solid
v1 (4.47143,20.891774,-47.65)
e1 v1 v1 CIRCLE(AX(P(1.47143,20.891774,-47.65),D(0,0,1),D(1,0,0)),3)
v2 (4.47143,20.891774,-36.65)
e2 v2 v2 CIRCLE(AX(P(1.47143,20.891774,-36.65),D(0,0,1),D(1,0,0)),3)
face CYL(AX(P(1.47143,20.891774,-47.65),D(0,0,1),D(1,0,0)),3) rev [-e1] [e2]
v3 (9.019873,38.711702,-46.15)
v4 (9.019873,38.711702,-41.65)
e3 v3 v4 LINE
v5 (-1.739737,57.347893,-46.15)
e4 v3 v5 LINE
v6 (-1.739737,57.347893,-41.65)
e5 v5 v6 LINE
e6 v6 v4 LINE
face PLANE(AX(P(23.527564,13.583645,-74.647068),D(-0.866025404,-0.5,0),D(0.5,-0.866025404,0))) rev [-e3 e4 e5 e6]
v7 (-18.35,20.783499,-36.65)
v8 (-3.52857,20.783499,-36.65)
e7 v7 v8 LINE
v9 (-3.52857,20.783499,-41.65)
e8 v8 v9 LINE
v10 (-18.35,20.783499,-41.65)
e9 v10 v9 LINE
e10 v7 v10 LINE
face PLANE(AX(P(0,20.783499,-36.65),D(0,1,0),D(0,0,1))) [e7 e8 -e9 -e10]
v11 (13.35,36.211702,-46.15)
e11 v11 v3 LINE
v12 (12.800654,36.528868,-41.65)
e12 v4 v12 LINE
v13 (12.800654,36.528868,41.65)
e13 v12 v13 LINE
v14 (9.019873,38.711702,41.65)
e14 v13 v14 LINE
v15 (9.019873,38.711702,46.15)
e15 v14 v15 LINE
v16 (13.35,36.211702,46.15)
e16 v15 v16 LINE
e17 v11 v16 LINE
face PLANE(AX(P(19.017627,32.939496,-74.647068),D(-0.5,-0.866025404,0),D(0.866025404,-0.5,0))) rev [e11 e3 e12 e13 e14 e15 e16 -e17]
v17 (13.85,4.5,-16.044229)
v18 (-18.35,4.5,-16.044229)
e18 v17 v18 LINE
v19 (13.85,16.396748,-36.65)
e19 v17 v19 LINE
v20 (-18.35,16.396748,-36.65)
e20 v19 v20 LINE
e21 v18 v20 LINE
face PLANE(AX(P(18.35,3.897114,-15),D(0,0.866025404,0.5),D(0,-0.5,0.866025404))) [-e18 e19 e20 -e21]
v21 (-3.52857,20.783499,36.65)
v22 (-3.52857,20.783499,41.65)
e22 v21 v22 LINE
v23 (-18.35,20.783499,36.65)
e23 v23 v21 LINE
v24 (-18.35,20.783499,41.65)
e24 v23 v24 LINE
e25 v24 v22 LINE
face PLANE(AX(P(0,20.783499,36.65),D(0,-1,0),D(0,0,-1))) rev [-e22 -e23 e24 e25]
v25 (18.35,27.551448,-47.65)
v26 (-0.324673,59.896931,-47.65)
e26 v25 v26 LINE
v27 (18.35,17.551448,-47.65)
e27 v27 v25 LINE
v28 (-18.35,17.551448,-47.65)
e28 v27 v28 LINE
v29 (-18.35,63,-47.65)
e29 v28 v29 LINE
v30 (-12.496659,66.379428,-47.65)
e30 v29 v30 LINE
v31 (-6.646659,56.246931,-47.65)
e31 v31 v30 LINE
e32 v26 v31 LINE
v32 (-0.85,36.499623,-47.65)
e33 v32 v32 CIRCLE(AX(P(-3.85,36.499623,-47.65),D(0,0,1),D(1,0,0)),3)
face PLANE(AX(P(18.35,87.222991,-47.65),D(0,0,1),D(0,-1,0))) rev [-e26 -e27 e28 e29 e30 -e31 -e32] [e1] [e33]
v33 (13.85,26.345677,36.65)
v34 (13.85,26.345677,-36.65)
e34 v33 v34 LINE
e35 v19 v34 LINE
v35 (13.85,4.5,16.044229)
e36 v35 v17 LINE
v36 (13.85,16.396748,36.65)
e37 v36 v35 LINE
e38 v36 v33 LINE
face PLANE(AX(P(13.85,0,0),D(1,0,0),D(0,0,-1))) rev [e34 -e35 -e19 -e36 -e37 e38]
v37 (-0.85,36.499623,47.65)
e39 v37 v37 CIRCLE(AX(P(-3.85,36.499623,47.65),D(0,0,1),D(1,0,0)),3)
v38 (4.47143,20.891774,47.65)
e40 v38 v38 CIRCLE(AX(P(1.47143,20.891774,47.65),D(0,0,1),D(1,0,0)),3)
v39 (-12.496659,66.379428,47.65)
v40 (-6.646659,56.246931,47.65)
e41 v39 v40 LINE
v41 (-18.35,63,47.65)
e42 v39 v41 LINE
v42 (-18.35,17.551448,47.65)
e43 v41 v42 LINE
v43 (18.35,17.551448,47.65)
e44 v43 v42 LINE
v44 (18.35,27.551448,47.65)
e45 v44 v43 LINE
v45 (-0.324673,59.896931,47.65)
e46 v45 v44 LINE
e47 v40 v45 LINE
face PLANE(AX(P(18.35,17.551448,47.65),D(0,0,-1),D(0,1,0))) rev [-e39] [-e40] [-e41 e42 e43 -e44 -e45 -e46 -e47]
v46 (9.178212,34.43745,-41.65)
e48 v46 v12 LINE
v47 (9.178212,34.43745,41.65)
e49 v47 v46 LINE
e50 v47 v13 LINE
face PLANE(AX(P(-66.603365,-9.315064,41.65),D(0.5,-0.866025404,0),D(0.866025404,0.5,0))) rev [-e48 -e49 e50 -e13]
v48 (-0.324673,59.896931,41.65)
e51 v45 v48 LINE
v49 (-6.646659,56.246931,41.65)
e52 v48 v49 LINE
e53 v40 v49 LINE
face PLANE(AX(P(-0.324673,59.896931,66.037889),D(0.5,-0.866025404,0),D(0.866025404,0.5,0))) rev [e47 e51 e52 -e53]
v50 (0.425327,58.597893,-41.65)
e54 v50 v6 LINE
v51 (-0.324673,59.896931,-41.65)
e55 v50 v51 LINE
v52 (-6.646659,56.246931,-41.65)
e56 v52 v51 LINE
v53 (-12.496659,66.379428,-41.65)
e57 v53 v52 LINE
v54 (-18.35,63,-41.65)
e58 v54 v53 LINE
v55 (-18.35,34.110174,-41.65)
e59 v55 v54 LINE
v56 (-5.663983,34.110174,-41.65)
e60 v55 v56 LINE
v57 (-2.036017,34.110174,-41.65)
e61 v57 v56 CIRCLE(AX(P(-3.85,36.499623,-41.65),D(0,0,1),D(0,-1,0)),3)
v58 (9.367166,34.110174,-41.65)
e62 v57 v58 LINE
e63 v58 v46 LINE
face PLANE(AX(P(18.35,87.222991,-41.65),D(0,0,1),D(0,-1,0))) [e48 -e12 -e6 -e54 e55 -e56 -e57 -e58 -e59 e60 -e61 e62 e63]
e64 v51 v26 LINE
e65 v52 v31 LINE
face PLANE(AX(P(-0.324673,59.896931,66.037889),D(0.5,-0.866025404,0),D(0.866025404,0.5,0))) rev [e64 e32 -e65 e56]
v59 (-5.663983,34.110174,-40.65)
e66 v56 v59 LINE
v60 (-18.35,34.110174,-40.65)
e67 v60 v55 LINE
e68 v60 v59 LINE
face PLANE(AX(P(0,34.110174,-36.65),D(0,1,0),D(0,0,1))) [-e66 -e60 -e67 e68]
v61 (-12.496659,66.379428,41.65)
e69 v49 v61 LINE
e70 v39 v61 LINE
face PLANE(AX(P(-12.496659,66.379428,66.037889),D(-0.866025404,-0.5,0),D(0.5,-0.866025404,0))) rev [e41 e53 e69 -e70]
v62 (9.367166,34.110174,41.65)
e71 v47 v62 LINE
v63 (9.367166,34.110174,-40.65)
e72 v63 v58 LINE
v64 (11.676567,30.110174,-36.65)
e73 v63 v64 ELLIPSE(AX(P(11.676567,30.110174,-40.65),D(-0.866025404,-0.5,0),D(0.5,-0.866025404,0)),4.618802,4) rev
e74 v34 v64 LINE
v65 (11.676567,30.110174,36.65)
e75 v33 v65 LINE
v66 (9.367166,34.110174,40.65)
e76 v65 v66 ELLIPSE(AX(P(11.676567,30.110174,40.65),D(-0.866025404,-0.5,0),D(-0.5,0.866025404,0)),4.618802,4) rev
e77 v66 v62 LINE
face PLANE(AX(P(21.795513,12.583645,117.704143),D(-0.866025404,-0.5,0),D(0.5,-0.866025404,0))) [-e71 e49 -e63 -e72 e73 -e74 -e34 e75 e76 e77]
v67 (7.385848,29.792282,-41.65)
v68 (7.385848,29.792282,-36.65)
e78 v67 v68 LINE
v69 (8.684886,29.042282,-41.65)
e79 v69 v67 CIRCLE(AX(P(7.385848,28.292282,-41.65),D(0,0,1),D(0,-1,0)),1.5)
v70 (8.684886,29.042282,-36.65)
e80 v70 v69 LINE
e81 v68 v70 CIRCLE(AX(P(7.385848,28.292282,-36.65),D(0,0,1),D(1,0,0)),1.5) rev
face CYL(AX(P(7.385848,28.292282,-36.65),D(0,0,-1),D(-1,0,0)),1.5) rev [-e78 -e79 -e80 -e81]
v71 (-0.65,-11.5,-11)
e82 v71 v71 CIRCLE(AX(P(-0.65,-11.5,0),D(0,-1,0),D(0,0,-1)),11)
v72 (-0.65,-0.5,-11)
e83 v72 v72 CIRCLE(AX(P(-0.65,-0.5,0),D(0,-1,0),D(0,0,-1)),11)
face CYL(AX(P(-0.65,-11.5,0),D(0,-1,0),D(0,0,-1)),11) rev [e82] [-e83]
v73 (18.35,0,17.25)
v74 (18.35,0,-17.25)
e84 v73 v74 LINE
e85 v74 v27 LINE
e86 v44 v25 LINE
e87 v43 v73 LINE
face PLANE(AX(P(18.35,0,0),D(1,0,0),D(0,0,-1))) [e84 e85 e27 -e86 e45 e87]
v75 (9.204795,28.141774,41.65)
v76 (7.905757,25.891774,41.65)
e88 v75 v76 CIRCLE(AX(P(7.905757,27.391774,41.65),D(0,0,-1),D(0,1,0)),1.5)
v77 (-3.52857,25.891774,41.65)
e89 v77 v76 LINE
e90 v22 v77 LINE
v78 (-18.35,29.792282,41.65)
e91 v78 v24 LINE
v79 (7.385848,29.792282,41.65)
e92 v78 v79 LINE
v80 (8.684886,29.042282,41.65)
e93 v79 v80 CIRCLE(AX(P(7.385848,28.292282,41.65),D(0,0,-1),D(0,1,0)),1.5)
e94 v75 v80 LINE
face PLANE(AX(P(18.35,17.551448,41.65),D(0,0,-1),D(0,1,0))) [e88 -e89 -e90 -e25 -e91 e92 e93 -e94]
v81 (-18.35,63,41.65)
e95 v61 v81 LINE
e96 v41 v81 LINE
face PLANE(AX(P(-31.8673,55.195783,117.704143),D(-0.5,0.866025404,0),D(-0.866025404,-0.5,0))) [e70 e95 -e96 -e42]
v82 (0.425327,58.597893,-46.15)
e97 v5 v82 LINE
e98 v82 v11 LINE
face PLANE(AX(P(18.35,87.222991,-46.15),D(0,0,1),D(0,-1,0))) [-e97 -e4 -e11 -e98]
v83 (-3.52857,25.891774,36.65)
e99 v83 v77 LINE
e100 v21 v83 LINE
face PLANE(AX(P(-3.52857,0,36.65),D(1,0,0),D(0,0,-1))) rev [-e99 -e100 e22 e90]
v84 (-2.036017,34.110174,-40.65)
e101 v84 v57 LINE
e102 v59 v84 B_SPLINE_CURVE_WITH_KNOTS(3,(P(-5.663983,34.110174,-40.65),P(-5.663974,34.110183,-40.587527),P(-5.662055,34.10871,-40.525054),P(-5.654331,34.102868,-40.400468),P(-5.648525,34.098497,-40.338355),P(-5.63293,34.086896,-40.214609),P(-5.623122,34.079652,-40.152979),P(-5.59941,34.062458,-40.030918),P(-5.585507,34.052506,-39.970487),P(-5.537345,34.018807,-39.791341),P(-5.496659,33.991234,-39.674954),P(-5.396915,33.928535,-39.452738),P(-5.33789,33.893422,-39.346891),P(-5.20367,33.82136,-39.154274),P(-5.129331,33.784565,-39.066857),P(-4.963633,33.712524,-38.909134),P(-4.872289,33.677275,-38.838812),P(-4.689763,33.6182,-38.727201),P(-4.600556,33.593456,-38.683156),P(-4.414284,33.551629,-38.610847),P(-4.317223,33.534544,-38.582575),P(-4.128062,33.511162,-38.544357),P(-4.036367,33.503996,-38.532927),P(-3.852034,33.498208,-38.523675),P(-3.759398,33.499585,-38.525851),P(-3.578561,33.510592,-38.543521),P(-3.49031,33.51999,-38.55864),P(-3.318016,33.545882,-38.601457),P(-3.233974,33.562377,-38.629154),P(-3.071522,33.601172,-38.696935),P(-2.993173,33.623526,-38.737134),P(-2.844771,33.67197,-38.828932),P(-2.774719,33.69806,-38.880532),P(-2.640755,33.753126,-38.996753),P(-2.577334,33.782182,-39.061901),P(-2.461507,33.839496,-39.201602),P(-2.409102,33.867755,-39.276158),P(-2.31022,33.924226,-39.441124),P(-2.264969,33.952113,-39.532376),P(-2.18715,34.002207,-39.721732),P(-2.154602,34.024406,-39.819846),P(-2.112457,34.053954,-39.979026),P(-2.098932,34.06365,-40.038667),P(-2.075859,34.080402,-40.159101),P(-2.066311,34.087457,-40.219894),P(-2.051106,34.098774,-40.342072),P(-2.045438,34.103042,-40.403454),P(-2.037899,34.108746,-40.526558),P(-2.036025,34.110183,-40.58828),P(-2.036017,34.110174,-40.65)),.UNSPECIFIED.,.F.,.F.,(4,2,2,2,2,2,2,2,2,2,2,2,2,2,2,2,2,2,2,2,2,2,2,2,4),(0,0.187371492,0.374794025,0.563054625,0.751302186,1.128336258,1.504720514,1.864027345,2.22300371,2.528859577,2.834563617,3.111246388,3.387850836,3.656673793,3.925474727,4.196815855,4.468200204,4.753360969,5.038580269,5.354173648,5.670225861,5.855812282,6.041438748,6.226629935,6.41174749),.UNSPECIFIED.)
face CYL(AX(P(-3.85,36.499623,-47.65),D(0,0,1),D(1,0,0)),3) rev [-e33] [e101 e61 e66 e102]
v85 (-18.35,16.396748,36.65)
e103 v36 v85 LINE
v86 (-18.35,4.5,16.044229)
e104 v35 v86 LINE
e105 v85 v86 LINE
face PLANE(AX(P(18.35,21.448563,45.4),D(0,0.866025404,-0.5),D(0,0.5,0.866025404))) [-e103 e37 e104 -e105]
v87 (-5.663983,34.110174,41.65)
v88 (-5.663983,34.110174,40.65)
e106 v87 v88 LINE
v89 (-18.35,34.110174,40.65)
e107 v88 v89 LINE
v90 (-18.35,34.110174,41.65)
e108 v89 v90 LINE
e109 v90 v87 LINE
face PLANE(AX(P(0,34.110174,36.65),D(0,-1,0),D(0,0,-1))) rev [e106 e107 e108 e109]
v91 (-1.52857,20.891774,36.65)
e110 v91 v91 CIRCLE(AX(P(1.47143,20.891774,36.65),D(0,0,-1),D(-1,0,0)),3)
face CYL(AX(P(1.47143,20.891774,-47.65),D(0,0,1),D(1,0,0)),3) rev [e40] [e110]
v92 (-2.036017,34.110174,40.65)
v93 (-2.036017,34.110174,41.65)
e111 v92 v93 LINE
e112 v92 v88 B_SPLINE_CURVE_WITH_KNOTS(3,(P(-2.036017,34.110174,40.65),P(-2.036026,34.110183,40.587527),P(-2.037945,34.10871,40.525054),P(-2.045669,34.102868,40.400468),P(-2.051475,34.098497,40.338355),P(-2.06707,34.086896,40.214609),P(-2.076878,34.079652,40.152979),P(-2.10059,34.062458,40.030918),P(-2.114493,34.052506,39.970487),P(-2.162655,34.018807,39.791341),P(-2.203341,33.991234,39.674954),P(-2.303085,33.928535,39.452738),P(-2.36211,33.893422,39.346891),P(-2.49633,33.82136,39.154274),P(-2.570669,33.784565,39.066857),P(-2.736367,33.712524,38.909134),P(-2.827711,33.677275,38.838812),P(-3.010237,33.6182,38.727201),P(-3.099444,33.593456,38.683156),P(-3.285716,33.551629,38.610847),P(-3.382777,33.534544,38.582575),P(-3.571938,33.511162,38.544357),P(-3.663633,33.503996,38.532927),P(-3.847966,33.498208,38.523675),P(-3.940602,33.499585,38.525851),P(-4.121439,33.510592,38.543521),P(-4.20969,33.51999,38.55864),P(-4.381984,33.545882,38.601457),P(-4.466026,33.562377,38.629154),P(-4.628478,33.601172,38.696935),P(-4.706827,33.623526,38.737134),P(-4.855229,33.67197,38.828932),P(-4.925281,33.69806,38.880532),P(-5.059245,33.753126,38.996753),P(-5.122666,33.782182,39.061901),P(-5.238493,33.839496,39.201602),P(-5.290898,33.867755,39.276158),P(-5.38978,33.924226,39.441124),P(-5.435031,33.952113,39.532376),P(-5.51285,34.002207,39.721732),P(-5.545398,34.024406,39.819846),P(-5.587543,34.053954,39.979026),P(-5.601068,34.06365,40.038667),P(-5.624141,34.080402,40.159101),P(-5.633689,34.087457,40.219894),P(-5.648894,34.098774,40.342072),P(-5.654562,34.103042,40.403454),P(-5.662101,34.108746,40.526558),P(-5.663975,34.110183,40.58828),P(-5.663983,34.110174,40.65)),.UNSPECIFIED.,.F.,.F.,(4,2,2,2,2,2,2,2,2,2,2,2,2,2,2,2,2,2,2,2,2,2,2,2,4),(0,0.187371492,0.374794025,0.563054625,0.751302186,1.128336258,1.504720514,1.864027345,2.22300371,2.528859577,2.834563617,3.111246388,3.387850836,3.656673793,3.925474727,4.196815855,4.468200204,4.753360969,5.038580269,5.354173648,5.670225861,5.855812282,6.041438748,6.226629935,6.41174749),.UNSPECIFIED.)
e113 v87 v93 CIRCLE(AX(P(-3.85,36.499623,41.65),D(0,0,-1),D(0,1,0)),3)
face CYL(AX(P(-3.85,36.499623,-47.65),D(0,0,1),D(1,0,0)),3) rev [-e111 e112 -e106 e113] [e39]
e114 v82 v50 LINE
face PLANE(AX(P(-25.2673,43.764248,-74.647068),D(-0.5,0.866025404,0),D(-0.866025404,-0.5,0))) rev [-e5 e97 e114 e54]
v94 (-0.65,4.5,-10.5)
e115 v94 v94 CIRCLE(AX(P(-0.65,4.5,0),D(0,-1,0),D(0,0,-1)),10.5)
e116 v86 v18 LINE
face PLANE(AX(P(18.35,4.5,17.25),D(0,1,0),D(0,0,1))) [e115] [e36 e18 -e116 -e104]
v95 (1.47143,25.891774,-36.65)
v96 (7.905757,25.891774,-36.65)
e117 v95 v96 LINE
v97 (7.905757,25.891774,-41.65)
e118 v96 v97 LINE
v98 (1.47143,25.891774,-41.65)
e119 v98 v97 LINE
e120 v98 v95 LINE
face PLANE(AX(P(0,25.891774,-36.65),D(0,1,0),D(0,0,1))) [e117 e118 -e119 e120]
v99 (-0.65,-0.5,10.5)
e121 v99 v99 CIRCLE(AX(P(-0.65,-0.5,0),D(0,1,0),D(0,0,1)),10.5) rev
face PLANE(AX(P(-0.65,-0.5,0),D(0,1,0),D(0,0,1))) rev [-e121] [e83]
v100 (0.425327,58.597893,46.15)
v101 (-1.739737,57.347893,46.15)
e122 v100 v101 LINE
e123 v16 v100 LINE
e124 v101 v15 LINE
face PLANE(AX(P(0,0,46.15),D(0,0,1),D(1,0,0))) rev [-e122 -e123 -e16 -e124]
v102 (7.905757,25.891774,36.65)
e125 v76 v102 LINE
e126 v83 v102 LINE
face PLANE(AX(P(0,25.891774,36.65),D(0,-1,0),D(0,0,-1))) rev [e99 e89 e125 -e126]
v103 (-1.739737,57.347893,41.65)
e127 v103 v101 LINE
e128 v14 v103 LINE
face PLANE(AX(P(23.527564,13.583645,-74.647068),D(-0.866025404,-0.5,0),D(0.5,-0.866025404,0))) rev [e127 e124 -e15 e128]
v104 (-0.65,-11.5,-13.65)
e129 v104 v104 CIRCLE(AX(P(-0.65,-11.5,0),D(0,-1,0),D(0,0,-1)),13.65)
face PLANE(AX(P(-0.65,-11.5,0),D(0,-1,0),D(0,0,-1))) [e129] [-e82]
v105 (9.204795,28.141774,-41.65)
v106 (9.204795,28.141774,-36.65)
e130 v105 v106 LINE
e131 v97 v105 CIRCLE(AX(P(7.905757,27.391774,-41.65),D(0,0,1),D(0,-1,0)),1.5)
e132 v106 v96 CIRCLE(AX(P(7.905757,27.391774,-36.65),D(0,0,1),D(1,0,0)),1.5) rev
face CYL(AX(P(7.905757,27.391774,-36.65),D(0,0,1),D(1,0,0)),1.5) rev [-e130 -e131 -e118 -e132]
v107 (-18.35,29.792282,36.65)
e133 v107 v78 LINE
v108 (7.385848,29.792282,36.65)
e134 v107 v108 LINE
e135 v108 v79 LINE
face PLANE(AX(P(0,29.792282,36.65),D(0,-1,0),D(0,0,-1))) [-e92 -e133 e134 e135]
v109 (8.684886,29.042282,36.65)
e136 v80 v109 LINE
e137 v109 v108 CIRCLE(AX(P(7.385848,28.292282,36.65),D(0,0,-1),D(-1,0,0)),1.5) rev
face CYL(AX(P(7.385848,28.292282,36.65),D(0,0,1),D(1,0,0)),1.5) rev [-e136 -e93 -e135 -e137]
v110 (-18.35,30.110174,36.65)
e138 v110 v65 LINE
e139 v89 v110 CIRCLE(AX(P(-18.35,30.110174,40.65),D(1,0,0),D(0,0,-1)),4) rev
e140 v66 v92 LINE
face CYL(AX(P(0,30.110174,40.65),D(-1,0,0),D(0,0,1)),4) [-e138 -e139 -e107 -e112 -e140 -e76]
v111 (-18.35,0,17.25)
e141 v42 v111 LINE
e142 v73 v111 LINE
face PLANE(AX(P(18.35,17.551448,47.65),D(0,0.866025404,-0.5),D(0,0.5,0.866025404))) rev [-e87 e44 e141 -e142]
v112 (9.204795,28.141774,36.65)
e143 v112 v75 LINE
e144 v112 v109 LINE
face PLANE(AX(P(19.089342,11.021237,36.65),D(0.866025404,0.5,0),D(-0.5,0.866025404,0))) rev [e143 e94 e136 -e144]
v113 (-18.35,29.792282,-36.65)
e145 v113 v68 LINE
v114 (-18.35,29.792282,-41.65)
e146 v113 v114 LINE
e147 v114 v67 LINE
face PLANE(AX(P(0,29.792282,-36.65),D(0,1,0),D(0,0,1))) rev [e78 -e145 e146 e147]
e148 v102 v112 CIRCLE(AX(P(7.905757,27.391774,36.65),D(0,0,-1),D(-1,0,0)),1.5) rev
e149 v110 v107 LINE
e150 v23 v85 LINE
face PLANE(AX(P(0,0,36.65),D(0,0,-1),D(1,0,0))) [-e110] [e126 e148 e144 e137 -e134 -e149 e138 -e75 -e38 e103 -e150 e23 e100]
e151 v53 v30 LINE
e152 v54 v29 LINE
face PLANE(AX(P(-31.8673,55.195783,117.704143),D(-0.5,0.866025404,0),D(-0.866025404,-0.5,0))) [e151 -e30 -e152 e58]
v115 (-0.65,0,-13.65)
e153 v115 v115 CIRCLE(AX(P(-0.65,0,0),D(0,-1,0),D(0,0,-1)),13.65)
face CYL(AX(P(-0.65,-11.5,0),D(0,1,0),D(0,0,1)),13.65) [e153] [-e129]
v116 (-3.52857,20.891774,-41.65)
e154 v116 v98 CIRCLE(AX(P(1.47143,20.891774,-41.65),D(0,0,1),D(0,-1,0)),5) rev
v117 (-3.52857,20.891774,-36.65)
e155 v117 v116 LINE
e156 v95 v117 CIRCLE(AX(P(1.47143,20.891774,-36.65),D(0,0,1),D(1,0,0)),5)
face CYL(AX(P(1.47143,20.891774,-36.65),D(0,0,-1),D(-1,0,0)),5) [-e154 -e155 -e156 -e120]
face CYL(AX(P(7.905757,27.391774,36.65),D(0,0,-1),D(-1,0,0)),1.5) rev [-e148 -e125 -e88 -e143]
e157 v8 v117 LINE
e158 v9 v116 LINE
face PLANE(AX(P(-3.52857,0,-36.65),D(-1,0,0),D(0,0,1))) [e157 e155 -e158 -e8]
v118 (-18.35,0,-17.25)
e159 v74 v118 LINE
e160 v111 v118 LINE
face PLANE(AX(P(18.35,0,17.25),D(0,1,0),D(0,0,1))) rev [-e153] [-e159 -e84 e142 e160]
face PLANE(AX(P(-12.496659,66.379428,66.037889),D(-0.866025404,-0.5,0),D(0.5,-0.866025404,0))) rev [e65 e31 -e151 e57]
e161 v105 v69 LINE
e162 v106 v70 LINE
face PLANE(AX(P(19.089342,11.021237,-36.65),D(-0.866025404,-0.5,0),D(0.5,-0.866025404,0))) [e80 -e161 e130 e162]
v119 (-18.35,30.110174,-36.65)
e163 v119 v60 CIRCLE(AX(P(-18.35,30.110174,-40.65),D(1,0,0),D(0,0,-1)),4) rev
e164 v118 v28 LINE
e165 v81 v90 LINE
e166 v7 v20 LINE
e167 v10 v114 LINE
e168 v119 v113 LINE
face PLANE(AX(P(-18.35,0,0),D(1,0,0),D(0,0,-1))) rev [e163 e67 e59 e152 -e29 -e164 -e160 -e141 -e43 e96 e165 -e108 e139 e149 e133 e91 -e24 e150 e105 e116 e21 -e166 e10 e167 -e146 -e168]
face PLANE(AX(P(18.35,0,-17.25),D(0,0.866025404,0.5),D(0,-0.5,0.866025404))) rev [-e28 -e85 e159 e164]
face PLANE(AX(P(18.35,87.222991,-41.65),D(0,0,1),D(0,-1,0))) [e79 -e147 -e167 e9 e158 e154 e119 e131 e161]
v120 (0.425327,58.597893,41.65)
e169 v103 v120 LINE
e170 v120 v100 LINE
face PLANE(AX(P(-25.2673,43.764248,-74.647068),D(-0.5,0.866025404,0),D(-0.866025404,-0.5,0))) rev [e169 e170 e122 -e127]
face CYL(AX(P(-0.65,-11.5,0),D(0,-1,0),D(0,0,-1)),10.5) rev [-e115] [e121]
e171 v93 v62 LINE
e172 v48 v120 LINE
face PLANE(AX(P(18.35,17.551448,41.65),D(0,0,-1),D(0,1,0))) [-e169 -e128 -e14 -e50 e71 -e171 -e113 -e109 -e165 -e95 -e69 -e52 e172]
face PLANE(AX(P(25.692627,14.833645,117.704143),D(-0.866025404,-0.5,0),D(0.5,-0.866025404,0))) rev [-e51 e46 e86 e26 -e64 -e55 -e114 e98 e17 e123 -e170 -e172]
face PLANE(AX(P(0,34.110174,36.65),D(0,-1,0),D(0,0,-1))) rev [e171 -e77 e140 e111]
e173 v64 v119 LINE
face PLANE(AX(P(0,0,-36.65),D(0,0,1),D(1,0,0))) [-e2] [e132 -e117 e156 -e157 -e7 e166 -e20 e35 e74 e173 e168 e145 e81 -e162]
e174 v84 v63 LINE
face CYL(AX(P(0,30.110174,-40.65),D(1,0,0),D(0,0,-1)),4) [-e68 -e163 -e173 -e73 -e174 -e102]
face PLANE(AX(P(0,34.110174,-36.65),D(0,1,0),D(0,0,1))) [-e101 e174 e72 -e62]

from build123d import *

# Parameters (mm, degrees)
EXTRUDE_1_DEPTH         = 18.35
CUT_EXTRUDE_1_DEPTH     = 95.3
SHELL1_START            = -41.65
SHELL1_DEPTH            = 83.3
SHELL1_START_2          = -18.35
SHELL1_2_DEPTH          = 32.2
CUT_EXTRUDE_2_REACH     = 121.678
SKETCH_5_R              = 13.65
EXTRUDE_2_DEPTH         = 11.5
CUT_EXTRUDE1_DEPTH      = 92.3
SKETCH4_W               = 83.3
SKETCH4_H               = 26.8
CUT_EXTRUDE2_DEPTH      = 4.5
M24_TAPPED_HOLE2_D      = 21
M24_TAPPED_HOLE2_DEPTH  = 16
M24_TAPPED_HOLE2_TIP    = 6.3090365
HOLEWZD2_D              = 22
HOLEWZD2_DEPTH          = 11
SKETCH20_W              = 14.821429848
SKETCH20_H              = 1.5
SKETCH20_W_2            = 17.378570152
BOSS_EXTRUDE2_DEPTH     = 5
FILLET1_R               = 1.5
FILLET2_R               = 4
SKETCH21_W              = 32.2
SKETCH21_H              = 2.401923789
BOSS_EXTRUDE3_DEPTH     = 2
FILLET1_OF_MIRROR1_R    = 1.5
FILLET2_OF_MIRROR1_R    = 4
CUT_EXTRUDE3_DEPTH      = 113.771632022
CUT_EXTRUDE3_DEPTH_BACK = 113.771632022
SKETCH22_R              = 3
FILLET3_R               = 5
CUT_EXTRUDE4_DEPTH      = 109.855137726
CUT_EXTRUDE4_DEPTH_BACK = 109.855137726
SKETCH23_R              = 3


with BuildPart() as part:
    # Эскиз2 → Бобышка-Вытянуть1 (new, symmetric)
    with BuildSketch(Plane(origin=(0, 0, 0), x_dir=(0, 0, -1), z_dir=(1, 0, 0))):
        Polygon((-17.25, 0), (17.25, 0), (47.65, 17.551448183), (47.65, 87.222990915), (-47.65, 87.222990915), (-47.65, 17.551448183), align=None)
    extrude(amount=EXTRUDE_1_DEPTH, both=True)

    # Эскиз3 → Вырез-Вытянуть1 (cut)
    with BuildSketch(Plane(origin=(0, 0, -47.65), x_dir=(-1, 0, 0), z_dir=(0, 0, -1))):
        Polygon((-18.35, 87.222990915), (-18.35, 27.551448183), (6.1746732, 70.029428205), (18.35, 63), (18.35, 87.222990915), align=None)
    extrude(amount=-CUT_EXTRUDE_1_DEPTH, mode=Mode.SUBTRACT)

    # Shell1: read off the stored shape, not the designer's step
    # Shell1 outline → Shell1 (cut)
    with BuildSketch(Plane.XY.offset(SHELL1_START)):
        Polygon((-18.35, 4.5), (13.85, 4.5), (13.85, 26.345676817), (-10.071787517, 67.779428205), (-18.35, 63), align=None)
    extrude(amount=SHELL1_DEPTH, mode=Mode.SUBTRACT)

    # Shell1 2 outline → Shell1 2 (add)
    with BuildSketch(Plane.YZ.offset(SHELL1_START_2)):
        Polygon((19.283498991, -41.65), (4.5, -16.044228634), (4.5, -25.044228634), (14.087346568, -41.65), align=None)
        Polygon((14.087346568, 41.65), (4.5, 25.044228634), (4.5, 16.044228634), (19.283498991, 41.65), align=None)
    extrude(amount=SHELL1_2_DEPTH)

    # Вырез-Вытянуть2: up to this face of the body (flat: up to its plane)
    cut_extrude_2_end = Plane(part.part.faces().sort_by_distance((-3.441629471, 38.42100508, 47.65))[0])
    # Эскиз4 → Вырез-Вытянуть2 (cut, up to the picked face)
    with BuildSketch(Plane(origin=(0, 0, -47.65), x_dir=(-1, 0, 0), z_dir=(0, 0, -1)), mode=Mode.PRIVATE) as cut_extrude_2_sk1:
        Polygon((6.1746732, 70.029428205), (12.496658648, 66.379428205), (6.646658648, 56.246930981), (0.3246732, 59.896930981), align=None)
    cut_extrude_2_tool1 = split(extrude(cut_extrude_2_sk1.sketch, amount=-CUT_EXTRUDE_2_REACH, mode=Mode.PRIVATE), bisect_by=cut_extrude_2_end, keep=Keep.BOTH, mode=Mode.PRIVATE)
    add(cut_extrude_2_tool1.solids().sort_by(Axis((-6.410666, 63.13818, -47.65), (0, 0, 1)))[0], mode=Mode.SUBTRACT)

    # Эскиз5 → Бобышка-Вытянуть2 (add)
    with BuildSketch(Plane.XZ):
        with Locations(Location((-0.65, 0, 0), (0, 0, 270))):
            Circle(SKETCH_5_R)
    extrude(amount=EXTRUDE_2_DEPTH)

    # Sketch3 → Cut-Extrude1 (cut)
    with BuildSketch(Plane.XY.offset(46.15)):
        Polygon((13.35, 36.211702221), (0.4253268, 58.597892875), (-1.73973671, 57.347892875), (9.019872981, 38.711702221), align=None)
    extrude(amount=-CUT_EXTRUDE1_DEPTH, mode=Mode.SUBTRACT)

    # Sketch4 → Cut-Extrude2 (cut)
    with BuildSketch(Plane(origin=(25.692627019, 14.833645126, 0), x_dir=(0, 0, -1), z_dir=(0.8660254037844454, 0.4999999999999885, 0))):
        with Locations((0, 38.634600438)):
            Rectangle(SKETCH4_W, SKETCH4_H)
    extrude(amount=-CUT_EXTRUDE2_DEPTH, mode=Mode.SUBTRACT)

    # M24 Tapped Hole2
    with Locations(Plane(origin=(0, -11.5, 0), x_dir=(-1, 0, 0), z_dir=(0, -1, 0))):
        with Locations((0.65, 0)):
            Hole(M24_TAPPED_HOLE2_D / 2, depth=M24_TAPPED_HOLE2_DEPTH)
            with Locations((0, 0, -(M24_TAPPED_HOLE2_DEPTH + M24_TAPPED_HOLE2_TIP / 2))):  # 118° drill point
                Cone(0, M24_TAPPED_HOLE2_D / 2, M24_TAPPED_HOLE2_TIP, mode=Mode.SUBTRACT)

    # HoleWzd2
    with Locations(Plane(origin=(-0.65, -11.5, 0), x_dir=(0, 0, -1), z_dir=(0, -1, 0))):
        with Locations((0, 0)):
            Hole(HOLEWZD2_D / 2, depth=HOLEWZD2_DEPTH)

    # Sketch20 → Boss-Extrude2 (add)
    with BuildSketch(Plane.XY.offset(-41.65)):
        with Locations((-10.939285076, 18.533498991)):
            Rectangle(SKETCH20_W, SKETCH20_H)
        with Locations((-10.939285076, 20.033498991)):
            Rectangle(SKETCH20_W, SKETCH20_H)
        Polygon((-3.528570152, 25.891773598), (-3.528570152, 20.783498991), (13.85, 20.783498991), (13.85, 25.891773598), (10.503833111, 25.891773598), align=None)
        Polygon((11.860101568, 29.792282004), (8.251873533, 29.792282004), (10.503833111, 25.891773598), (13.85, 25.891773598), (13.85, 26.345676817), align=None)
        Polygon((-18.35, 34.110173911), (-18.35, 29.792282004), (8.251873533, 29.792282004), (11.860101568, 29.792282004), (9.367165513, 34.110173911), align=None)
        with Locations((5.160714924, 18.533498991)):
            Rectangle(SKETCH20_W_2, SKETCH20_H)
        with Locations((5.160714924, 20.033498991)):
            Rectangle(SKETCH20_W_2, SKETCH20_H)
    boss_extrude2 = extrude(amount=BOSS_EXTRUDE2_DEPTH)

    # Fillet1
    fillet1_edges = [part.edges().sort_by_distance(p)[0] for p in [
        (10.503833111, 25.891773598, -39.15),
        (8.251873533, 29.792282004, -39.15),
    ]]
    fillet(fillet1_edges, radius=FILLET1_R)

    # Fillet2
    fillet2_edges = [part.edges().sort_by_distance(p)[0] for p in [
        (-4.491417244, 34.110173911, -36.65),
    ]]
    fillet(fillet2_edges, radius=FILLET2_R)

    # Sketch21 → Boss-Extrude3 (add)
    with BuildSketch(Plane.XZ.offset(-17.783498991)):
        with Locations((-2.25, -37.850961895)):
            Rectangle(SKETCH21_W, SKETCH21_H)
    boss_extrude3 = extrude(amount=BOSS_EXTRUDE3_DEPTH)

    # Mirror1: Boss-Extrude2, Boss-Extrude3 across plane
    add(boss_extrude2.mirror(Plane.XY))
    add(boss_extrude3.mirror(Plane.XY))

    # Fillet1 of Mirror1
    fillet1_of_mirror1_edges = [part.edges().sort_by_distance(p)[0] for p in [
        (10.503833111, 25.891773598, 39.15),
        (8.251873533, 29.792282004, 39.15),
    ]]
    fillet(fillet1_of_mirror1_edges, radius=FILLET1_OF_MIRROR1_R)

    # Fillet2 of Mirror1
    fillet2_of_mirror1_edges = [part.edges().sort_by_distance(p)[0] for p in [
        (-4.491417244, 34.110173911, 36.65),
    ]]
    fillet(fillet2_of_mirror1_edges, radius=FILLET2_OF_MIRROR1_R)

    # Sketch22 → Cut-Extrude3 (cut, two sides: drawn at the far end of the back side and taken through both)
    with BuildSketch(Plane.XY.offset(-41.65).offset(-CUT_EXTRUDE3_DEPTH_BACK)):
        with Locations((-3.85, 36.499622644)):
            Circle(SKETCH22_R)
    extrude(amount=CUT_EXTRUDE3_DEPTH + CUT_EXTRUDE3_DEPTH_BACK, mode=Mode.SUBTRACT)

    # Fillet3
    fillet3_edges = [part.edges().sort_by_distance(p)[0] for p in [
        (-3.528570152, 25.891773598, -39.15),
    ]]
    fillet(fillet3_edges, radius=FILLET3_R)

    # Sketch23 → Cut-Extrude4 (cut, two sides: drawn at the far end of the back side and taken through both)
    with BuildSketch(Plane.XY.offset(-36.65).offset(-CUT_EXTRUDE4_DEPTH_BACK)):
        with Locations((1.471429848, 20.891773598)):
            Circle(SKETCH23_R)
    extrude(amount=CUT_EXTRUDE4_DEPTH + CUT_EXTRUDE4_DEPTH_BACK, mode=Mode.SUBTRACT)


solid = part.part
